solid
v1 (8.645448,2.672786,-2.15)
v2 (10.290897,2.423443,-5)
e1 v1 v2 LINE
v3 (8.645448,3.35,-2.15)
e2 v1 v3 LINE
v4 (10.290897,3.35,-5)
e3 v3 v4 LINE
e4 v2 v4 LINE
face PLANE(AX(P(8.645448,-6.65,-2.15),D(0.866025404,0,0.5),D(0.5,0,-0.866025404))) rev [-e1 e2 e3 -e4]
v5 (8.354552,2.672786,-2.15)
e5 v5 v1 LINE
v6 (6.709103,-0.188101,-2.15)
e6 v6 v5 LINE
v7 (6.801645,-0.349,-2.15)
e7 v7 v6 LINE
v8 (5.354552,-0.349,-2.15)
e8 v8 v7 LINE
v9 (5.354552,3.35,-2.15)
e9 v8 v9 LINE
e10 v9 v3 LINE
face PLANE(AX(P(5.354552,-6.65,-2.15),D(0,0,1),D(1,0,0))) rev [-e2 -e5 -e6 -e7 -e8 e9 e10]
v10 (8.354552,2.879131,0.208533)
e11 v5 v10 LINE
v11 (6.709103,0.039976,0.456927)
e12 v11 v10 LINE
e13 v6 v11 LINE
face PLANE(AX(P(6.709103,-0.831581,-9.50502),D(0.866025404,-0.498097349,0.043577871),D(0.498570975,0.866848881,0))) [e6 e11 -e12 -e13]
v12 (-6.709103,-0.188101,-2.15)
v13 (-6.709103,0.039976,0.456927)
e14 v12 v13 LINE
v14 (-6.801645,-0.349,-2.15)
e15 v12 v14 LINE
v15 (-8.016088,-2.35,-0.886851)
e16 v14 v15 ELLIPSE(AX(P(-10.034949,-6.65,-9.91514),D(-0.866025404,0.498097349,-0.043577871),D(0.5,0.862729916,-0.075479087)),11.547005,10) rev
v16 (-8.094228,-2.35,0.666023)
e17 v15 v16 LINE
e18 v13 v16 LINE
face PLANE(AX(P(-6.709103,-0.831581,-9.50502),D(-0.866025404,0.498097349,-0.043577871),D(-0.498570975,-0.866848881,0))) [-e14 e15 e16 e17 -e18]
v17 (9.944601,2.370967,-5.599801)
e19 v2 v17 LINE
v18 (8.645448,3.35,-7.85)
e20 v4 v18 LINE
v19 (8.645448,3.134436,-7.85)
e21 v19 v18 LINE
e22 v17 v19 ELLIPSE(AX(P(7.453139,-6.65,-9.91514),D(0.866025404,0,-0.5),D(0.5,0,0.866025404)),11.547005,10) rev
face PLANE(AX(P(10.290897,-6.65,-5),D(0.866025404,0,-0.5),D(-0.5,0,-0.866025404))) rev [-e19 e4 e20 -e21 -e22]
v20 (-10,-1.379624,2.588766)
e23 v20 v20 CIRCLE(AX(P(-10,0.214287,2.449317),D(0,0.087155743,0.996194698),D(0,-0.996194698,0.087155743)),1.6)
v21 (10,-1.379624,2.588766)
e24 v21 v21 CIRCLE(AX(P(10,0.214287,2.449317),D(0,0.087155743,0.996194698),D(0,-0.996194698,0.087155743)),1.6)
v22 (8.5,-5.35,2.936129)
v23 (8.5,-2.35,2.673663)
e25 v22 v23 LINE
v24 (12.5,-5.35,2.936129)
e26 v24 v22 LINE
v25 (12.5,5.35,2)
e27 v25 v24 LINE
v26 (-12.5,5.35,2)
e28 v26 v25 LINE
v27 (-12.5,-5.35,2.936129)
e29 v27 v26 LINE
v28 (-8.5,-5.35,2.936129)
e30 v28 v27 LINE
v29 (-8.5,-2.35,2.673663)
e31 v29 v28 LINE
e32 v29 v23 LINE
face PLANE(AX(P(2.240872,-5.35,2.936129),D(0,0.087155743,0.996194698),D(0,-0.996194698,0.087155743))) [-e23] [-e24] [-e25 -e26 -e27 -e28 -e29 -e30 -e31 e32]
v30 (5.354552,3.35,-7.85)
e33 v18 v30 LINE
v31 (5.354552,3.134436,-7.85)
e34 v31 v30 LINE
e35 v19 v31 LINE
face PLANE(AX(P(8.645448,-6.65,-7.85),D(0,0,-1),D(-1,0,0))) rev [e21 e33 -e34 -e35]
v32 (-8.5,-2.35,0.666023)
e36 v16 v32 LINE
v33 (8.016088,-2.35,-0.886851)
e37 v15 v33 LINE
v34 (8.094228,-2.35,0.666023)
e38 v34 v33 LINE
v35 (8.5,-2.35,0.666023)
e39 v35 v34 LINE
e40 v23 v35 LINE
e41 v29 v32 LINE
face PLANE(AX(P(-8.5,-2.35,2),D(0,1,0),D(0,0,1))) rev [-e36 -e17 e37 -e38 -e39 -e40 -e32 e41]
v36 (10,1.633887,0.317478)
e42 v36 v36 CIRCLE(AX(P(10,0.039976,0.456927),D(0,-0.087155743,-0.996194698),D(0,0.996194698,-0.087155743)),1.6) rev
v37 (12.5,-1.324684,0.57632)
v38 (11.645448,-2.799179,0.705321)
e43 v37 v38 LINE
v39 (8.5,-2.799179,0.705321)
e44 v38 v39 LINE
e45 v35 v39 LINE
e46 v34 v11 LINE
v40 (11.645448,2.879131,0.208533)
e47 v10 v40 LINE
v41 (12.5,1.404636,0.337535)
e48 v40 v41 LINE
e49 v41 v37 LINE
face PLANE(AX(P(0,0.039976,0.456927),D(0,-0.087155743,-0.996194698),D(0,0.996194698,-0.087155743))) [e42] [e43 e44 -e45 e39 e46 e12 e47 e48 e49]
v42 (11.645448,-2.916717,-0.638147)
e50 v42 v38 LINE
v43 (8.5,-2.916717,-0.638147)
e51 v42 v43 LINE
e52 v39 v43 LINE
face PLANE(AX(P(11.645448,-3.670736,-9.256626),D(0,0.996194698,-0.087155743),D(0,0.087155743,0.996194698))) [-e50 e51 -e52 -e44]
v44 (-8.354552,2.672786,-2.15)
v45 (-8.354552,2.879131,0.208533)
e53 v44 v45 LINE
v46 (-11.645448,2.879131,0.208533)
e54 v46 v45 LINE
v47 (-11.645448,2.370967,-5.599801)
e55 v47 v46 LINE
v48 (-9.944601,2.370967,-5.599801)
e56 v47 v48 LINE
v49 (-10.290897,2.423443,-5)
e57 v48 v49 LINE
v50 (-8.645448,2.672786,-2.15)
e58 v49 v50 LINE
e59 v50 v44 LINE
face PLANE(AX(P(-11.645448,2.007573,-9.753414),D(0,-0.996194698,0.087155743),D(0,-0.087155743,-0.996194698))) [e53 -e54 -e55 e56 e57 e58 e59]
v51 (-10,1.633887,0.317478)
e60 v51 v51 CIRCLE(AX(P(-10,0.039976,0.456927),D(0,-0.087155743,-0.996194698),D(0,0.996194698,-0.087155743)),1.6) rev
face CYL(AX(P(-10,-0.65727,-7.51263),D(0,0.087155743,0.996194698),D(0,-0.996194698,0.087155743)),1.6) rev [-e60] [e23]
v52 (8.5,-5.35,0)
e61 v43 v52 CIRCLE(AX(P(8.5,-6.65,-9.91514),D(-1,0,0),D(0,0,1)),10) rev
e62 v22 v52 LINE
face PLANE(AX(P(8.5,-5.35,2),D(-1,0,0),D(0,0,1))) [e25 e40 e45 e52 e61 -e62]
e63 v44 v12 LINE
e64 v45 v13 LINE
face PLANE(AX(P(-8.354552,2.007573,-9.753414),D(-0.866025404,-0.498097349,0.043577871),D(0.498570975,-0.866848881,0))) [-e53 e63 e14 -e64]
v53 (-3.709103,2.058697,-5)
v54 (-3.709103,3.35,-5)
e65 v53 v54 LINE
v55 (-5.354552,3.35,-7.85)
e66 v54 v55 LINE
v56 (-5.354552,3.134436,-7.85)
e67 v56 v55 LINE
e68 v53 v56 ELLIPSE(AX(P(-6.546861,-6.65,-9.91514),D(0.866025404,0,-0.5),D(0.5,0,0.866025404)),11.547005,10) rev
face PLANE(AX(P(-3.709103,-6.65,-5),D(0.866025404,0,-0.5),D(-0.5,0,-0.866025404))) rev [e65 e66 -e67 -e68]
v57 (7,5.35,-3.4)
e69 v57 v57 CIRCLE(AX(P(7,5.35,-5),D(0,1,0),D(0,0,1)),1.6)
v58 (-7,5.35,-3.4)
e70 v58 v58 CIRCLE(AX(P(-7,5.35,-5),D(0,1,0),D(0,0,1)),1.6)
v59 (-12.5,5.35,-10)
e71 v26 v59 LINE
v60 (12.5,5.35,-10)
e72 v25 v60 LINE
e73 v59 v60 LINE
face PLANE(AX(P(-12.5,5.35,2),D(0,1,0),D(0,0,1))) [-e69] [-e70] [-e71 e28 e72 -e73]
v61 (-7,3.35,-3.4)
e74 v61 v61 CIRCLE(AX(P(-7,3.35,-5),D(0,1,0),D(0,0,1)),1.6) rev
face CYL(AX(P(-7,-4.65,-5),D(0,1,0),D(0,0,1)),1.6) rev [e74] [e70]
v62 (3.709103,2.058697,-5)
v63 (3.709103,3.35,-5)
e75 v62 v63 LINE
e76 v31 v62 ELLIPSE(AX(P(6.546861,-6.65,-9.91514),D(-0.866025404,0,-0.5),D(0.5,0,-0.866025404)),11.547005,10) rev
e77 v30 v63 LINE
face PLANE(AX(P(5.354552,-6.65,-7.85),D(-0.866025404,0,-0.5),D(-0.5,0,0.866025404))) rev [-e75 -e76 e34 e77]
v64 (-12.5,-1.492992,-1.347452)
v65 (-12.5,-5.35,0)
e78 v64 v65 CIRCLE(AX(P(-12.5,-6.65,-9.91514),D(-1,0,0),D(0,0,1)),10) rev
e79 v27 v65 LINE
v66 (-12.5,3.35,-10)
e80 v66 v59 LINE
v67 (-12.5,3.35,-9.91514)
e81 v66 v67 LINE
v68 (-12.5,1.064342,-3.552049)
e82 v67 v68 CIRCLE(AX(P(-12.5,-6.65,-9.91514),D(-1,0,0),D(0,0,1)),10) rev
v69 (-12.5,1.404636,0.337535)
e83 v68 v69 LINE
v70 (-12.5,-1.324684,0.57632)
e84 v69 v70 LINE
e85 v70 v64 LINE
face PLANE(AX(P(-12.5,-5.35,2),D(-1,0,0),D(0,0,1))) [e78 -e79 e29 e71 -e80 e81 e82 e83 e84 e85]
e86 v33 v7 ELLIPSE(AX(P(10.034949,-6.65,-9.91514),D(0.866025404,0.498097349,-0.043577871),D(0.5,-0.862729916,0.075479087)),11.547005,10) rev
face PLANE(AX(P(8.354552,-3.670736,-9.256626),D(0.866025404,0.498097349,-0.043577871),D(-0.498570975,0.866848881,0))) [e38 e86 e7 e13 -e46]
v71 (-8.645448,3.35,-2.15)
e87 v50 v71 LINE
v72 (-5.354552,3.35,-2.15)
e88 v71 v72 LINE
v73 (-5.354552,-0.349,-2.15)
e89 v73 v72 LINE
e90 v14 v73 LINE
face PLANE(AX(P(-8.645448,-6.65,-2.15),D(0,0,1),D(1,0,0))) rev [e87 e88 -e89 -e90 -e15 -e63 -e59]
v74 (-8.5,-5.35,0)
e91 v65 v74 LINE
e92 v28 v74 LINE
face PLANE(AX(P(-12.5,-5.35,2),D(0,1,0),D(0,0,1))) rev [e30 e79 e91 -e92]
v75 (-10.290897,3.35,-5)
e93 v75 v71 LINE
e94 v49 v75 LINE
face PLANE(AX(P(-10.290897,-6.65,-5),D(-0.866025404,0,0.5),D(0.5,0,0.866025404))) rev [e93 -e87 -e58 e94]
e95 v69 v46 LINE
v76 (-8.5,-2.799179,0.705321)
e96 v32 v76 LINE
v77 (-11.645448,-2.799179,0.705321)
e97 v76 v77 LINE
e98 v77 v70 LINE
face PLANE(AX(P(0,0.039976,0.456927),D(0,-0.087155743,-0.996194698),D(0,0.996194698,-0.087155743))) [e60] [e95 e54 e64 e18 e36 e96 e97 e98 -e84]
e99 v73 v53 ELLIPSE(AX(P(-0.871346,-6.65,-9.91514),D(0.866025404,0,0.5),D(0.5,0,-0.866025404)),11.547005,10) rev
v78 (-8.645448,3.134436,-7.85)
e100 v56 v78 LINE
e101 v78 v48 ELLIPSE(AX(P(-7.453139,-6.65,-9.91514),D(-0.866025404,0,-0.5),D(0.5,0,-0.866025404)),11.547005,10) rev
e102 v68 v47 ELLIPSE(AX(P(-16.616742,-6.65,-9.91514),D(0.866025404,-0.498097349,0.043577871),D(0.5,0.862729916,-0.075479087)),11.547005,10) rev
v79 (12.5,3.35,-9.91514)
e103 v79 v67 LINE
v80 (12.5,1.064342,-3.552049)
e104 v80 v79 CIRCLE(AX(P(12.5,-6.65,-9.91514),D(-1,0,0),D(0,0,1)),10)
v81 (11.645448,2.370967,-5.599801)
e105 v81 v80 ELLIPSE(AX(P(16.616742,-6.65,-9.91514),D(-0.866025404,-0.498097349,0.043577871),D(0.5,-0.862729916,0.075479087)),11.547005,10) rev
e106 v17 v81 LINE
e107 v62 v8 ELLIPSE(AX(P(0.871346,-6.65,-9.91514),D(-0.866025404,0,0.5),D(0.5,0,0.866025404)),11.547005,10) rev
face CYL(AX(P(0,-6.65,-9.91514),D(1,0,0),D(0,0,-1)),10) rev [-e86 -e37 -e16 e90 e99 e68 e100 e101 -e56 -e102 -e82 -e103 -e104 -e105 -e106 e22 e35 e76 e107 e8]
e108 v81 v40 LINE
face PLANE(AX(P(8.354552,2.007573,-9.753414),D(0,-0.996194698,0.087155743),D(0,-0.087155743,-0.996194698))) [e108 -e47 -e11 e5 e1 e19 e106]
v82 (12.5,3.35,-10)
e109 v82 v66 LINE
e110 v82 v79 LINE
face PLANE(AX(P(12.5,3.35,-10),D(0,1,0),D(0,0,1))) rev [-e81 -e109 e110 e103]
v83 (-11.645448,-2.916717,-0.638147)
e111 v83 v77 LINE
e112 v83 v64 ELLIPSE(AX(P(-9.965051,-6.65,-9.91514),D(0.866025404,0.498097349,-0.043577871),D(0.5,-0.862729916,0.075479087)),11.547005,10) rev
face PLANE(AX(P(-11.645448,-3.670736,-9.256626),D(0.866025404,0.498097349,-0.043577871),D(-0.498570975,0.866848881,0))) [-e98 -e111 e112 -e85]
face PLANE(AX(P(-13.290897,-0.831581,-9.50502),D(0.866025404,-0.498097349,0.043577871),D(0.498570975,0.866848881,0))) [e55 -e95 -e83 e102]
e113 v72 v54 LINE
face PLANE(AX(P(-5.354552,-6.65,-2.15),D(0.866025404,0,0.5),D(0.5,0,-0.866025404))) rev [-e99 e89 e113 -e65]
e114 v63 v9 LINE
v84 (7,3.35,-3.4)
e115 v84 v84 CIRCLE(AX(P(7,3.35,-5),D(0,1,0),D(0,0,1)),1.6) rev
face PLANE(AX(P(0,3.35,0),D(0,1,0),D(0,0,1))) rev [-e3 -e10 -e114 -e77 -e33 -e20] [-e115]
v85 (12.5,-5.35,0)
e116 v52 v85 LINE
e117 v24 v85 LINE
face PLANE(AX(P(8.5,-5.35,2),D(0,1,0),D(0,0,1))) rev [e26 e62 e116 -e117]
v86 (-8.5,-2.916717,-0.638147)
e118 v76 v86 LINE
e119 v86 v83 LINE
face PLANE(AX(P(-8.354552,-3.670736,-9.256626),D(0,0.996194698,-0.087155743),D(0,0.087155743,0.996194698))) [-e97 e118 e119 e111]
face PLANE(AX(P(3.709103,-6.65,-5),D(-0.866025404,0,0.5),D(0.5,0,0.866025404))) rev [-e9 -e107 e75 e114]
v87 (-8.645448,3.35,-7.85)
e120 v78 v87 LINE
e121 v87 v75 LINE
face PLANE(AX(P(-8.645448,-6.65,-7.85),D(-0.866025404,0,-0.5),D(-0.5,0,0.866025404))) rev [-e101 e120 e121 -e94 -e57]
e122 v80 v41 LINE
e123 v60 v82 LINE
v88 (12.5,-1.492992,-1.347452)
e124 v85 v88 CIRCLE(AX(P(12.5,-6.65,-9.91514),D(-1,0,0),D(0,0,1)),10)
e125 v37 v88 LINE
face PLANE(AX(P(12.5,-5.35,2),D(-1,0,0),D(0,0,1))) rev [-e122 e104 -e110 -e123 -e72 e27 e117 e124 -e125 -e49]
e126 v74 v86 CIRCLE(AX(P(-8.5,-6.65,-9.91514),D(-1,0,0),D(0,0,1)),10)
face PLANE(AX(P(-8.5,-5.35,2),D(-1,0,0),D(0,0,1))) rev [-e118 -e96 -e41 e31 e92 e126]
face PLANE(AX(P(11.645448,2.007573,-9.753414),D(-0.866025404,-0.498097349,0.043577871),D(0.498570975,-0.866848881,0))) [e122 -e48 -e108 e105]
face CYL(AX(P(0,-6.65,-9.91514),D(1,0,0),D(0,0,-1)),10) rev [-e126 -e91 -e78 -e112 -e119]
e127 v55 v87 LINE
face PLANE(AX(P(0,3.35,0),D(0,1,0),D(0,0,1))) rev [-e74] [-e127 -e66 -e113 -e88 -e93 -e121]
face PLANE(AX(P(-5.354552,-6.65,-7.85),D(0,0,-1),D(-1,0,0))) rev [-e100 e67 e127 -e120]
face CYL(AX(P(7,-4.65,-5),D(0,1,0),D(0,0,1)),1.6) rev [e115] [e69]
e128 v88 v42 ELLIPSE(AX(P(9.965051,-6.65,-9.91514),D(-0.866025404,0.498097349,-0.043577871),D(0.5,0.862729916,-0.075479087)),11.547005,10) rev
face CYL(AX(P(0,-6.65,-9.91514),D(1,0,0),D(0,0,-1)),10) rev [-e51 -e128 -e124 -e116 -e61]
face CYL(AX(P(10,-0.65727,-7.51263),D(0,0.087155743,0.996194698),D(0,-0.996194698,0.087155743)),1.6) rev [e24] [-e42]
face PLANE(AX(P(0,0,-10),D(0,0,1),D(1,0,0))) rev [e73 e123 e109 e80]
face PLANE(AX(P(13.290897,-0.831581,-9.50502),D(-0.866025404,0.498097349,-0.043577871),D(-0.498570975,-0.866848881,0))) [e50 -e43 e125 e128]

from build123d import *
from build123d.topology import SkipClean

# Parameters (mm, degrees)
BOSS_EXTRUDE1_DEPTH = 2
SKETCH2_W           = 25
SKETCH2_H           = 2
BOSS_EXTRUDE2_DEPTH = 10
SKETCH3_R           = 1.6
CUT_EXTRUDE1_DEPTH  = 10
FILLET5_START       = -12.5
FILLET5_DEPTH       = 25
FILLET5_2_DEPTH     = 4
FILLET5_START_2     = 8.5
FILLET5_3_DEPTH     = 4
FILLET5_4_OUTLINE_R = 1.6
FILLET5_4_DEPTH     = 3.35
CUT_EXTRUDE3_DEPTH  = 10
BOSS_EXTRUDE3_DEPTH = 4
BOSS_EXTRUDE4_START = -21
BOSS_EXTRUDE4_DEPTH = 4
BOSS_EXTRUDE5_REACH = 25.867
SKETCH9_R           = 1.6
CUT_EXTRUDE5_DEPTH  = 10
CUT_EXTRUDE4_START  = 2
CUT_EXTRUDE4_DEPTH  = 10


with BuildPart() as part:
    # Sketch1 → Boss-Extrude1 (new body)
    with BuildSketch(Plane.XY):
        Polygon((8.5, -5.35), (12.5, -5.35), (12.5, 5.35), (-12.5, 5.35), (-12.5, -5.35), (-8.5, -5.35), (-8.5, -2.35), (8.5, -2.35), align=None)
    extrude(amount=BOSS_EXTRUDE1_DEPTH)

    # Sketch2 → Boss-Extrude2 (add)
    with BuildSketch(Plane(origin=(0, 0, 0), x_dir=(-1, 0, 0), z_dir=(0, 0, -1))):
        with Locations((0, 4.35)):
            Rectangle(SKETCH2_W, SKETCH2_H)
    extrude(amount=BOSS_EXTRUDE2_DEPTH)

    # Sketch3 → Cut-Extrude1 (cut)
    with BuildSketch(Plane(origin=(0, 5.35, 0), x_dir=(1, 0, 0), z_dir=(0, 1, 0))):
        with Locations(Location((-7, 5, 0), (0, 0, 270))):
            Circle(SKETCH3_R)
        with Locations(Location((7, 5, 0), (0, 0, 270))):
            Circle(SKETCH3_R)
    extrude(amount=-CUT_EXTRUDE1_DEPTH, mode=Mode.SUBTRACT)

    # Fillet5: read off the stored shape, not the designer's step
    # Fillet5 outline → Fillet5 (add)
    with BuildSketch(Plane.YZ.offset(FILLET5_START)):
        with BuildLine():
            Line((-2.35, 0), (-2.35, -0.886851064))
            ThreePointArc((-2.35, -0.886851064), (1.805767263, -4.576600812), (3.35, -9.915139938))
            Line((3.35, -9.915139938), (3.35, 0))
            Line((3.35, 0), (-2.35, 0))
        make_face()
    extrude(amount=FILLET5_DEPTH)

    # Fillet5 2 outline → Fillet5 2 (add)
    with BuildSketch(Plane.YZ.offset(FILLET5_START)):
        with BuildLine():
            ThreePointArc((-5.35, 0), (-3.81510561, -0.325386355), (-2.35, -0.886851064))
            Line((-2.35, -0.886851064), (-2.35, 0))
            Line((-2.35, 0), (-5.35, 0))
        make_face()
    extrude(amount=FILLET5_2_DEPTH)

    # Fillet5 3 outline → Fillet5 3 (add)
    with BuildSketch(Plane.YZ.offset(FILLET5_START_2)):
        with BuildLine():
            ThreePointArc((-5.35, 0), (-3.81510561, -0.325386355), (-2.35, -0.886851064))
            Line((-2.35, -0.886851064), (-2.35, 0))
            Line((-2.35, 0), (-5.35, 0))
        make_face()
    extrude(amount=FILLET5_3_DEPTH)

    # Fillet5 4 outline → Fillet5 4 (cut)
    with SkipClean():  # the faces are left unmerged after this step: merging them gives an invalid solid
        with BuildSketch(Plane(origin=(0, 0, 0), x_dir=(1, 0, 0), z_dir=(0, 1, 0))):
            with Locations((7, 5)):
                Circle(FILLET5_4_OUTLINE_R)
            with Locations((-7, 5)):
                Circle(FILLET5_4_OUTLINE_R)
        extrude(amount=FILLET5_4_DEPTH, mode=Mode.SUBTRACT)

    # Sketch4 → Cut-Extrude3 (cut)
    with BuildSketch(Plane(origin=(0, 3.35, 0), x_dir=(1, 0, 0), z_dir=(0, 1, 0))):
        Polygon((-3.709103466, 5), (-5.354551733, 7.85), (-8.645448267, 7.85), (-10.290896534, 5), (-8.645448267, 2.15), (-5.354551733, 2.15), align=None)
        Polygon((3.709103466, 5), (5.354551733, 2.15), (8.645448267, 2.15), (10.290896534, 5), (8.645448267, 7.85), (5.354551733, 7.85), align=None)
    extrude(amount=-CUT_EXTRUDE3_DEPTH, mode=Mode.SUBTRACT)

    # Sketch7 → Boss-Extrude3 (add)
    with BuildSketch(Plane.ZY.offset(12.5)):
        Polygon((2, -5.35), (2.9361287, -5.35), (2, 5.35), align=None)
    extrude(amount=-BOSS_EXTRUDE3_DEPTH)

    # Sketch7<2> → Boss-Extrude4 (add)
    with BuildSketch(Plane.ZY.offset(12.5).offset(BOSS_EXTRUDE4_START)):
        Polygon((2, -5.35), (2.9361287, -5.35), (2, 5.35), align=None)
    extrude(amount=-BOSS_EXTRUDE4_DEPTH)

    # Sketch10 → Boss-Extrude5 (add, up to next)
    with BuildSketch(Plane.ZY.offset(-8.5), mode=Mode.PRIVATE) as boss_extrude5_sk1:
        Polygon((2, -2.35), (2.673662709, -2.35), (2, 5.35), align=None)
    boss_extrude5_tool1 = extrude(boss_extrude5_sk1.sketch, amount=BOSS_EXTRUDE5_REACH, mode=Mode.PRIVATE) - part.part
    add(boss_extrude5_tool1.solids().sort_by_distance((8.5, 0.216667, 2.224554))[0])

    # Sketch9 → Cut-Extrude5 (cut)
    with BuildSketch(Plane(origin=(0, 0.214287438, 2.449316628), x_dir=(1, 0, 0), z_dir=(0, 0.08715574274766177, 0.9961946980917453))):
        with Locations(Location((-10, 0, 0), (0, 0, 270))):
            Circle(SKETCH9_R)
        with Locations(Location((10, 0, 0), (0, 0, 270))):
            Circle(SKETCH9_R)
    extrude(amount=-CUT_EXTRUDE5_DEPTH, mode=Mode.SUBTRACT)

    # Sketch6 → Cut-Extrude4 (cut)
    with BuildSketch(Plane(origin=(0, 10.679641635, 1.533716776), x_dir=(1, 0, 0), z_dir=(0, -0.08715574274766179, -0.9961946980917453)).offset(CUT_EXTRUDE4_START)):
        Polygon((-6.709103466, 10.505330149), (-8.354551733, 13.355330149), (-11.645448267, 13.355330149), (-13.290896534, 10.505330149), (-11.645448267, 7.655330149), (-8.354551733, 7.655330149), align=None)
        Polygon((6.709103466, 10.505330149), (8.354551733, 7.655330149), (11.645448267, 7.655330149), (13.290896534, 10.505330149), (11.645448267, 13.355330149), (8.354551733, 13.355330149), align=None)
    extrude(amount=CUT_EXTRUDE4_DEPTH, mode=Mode.SUBTRACT)


solid = part.part
